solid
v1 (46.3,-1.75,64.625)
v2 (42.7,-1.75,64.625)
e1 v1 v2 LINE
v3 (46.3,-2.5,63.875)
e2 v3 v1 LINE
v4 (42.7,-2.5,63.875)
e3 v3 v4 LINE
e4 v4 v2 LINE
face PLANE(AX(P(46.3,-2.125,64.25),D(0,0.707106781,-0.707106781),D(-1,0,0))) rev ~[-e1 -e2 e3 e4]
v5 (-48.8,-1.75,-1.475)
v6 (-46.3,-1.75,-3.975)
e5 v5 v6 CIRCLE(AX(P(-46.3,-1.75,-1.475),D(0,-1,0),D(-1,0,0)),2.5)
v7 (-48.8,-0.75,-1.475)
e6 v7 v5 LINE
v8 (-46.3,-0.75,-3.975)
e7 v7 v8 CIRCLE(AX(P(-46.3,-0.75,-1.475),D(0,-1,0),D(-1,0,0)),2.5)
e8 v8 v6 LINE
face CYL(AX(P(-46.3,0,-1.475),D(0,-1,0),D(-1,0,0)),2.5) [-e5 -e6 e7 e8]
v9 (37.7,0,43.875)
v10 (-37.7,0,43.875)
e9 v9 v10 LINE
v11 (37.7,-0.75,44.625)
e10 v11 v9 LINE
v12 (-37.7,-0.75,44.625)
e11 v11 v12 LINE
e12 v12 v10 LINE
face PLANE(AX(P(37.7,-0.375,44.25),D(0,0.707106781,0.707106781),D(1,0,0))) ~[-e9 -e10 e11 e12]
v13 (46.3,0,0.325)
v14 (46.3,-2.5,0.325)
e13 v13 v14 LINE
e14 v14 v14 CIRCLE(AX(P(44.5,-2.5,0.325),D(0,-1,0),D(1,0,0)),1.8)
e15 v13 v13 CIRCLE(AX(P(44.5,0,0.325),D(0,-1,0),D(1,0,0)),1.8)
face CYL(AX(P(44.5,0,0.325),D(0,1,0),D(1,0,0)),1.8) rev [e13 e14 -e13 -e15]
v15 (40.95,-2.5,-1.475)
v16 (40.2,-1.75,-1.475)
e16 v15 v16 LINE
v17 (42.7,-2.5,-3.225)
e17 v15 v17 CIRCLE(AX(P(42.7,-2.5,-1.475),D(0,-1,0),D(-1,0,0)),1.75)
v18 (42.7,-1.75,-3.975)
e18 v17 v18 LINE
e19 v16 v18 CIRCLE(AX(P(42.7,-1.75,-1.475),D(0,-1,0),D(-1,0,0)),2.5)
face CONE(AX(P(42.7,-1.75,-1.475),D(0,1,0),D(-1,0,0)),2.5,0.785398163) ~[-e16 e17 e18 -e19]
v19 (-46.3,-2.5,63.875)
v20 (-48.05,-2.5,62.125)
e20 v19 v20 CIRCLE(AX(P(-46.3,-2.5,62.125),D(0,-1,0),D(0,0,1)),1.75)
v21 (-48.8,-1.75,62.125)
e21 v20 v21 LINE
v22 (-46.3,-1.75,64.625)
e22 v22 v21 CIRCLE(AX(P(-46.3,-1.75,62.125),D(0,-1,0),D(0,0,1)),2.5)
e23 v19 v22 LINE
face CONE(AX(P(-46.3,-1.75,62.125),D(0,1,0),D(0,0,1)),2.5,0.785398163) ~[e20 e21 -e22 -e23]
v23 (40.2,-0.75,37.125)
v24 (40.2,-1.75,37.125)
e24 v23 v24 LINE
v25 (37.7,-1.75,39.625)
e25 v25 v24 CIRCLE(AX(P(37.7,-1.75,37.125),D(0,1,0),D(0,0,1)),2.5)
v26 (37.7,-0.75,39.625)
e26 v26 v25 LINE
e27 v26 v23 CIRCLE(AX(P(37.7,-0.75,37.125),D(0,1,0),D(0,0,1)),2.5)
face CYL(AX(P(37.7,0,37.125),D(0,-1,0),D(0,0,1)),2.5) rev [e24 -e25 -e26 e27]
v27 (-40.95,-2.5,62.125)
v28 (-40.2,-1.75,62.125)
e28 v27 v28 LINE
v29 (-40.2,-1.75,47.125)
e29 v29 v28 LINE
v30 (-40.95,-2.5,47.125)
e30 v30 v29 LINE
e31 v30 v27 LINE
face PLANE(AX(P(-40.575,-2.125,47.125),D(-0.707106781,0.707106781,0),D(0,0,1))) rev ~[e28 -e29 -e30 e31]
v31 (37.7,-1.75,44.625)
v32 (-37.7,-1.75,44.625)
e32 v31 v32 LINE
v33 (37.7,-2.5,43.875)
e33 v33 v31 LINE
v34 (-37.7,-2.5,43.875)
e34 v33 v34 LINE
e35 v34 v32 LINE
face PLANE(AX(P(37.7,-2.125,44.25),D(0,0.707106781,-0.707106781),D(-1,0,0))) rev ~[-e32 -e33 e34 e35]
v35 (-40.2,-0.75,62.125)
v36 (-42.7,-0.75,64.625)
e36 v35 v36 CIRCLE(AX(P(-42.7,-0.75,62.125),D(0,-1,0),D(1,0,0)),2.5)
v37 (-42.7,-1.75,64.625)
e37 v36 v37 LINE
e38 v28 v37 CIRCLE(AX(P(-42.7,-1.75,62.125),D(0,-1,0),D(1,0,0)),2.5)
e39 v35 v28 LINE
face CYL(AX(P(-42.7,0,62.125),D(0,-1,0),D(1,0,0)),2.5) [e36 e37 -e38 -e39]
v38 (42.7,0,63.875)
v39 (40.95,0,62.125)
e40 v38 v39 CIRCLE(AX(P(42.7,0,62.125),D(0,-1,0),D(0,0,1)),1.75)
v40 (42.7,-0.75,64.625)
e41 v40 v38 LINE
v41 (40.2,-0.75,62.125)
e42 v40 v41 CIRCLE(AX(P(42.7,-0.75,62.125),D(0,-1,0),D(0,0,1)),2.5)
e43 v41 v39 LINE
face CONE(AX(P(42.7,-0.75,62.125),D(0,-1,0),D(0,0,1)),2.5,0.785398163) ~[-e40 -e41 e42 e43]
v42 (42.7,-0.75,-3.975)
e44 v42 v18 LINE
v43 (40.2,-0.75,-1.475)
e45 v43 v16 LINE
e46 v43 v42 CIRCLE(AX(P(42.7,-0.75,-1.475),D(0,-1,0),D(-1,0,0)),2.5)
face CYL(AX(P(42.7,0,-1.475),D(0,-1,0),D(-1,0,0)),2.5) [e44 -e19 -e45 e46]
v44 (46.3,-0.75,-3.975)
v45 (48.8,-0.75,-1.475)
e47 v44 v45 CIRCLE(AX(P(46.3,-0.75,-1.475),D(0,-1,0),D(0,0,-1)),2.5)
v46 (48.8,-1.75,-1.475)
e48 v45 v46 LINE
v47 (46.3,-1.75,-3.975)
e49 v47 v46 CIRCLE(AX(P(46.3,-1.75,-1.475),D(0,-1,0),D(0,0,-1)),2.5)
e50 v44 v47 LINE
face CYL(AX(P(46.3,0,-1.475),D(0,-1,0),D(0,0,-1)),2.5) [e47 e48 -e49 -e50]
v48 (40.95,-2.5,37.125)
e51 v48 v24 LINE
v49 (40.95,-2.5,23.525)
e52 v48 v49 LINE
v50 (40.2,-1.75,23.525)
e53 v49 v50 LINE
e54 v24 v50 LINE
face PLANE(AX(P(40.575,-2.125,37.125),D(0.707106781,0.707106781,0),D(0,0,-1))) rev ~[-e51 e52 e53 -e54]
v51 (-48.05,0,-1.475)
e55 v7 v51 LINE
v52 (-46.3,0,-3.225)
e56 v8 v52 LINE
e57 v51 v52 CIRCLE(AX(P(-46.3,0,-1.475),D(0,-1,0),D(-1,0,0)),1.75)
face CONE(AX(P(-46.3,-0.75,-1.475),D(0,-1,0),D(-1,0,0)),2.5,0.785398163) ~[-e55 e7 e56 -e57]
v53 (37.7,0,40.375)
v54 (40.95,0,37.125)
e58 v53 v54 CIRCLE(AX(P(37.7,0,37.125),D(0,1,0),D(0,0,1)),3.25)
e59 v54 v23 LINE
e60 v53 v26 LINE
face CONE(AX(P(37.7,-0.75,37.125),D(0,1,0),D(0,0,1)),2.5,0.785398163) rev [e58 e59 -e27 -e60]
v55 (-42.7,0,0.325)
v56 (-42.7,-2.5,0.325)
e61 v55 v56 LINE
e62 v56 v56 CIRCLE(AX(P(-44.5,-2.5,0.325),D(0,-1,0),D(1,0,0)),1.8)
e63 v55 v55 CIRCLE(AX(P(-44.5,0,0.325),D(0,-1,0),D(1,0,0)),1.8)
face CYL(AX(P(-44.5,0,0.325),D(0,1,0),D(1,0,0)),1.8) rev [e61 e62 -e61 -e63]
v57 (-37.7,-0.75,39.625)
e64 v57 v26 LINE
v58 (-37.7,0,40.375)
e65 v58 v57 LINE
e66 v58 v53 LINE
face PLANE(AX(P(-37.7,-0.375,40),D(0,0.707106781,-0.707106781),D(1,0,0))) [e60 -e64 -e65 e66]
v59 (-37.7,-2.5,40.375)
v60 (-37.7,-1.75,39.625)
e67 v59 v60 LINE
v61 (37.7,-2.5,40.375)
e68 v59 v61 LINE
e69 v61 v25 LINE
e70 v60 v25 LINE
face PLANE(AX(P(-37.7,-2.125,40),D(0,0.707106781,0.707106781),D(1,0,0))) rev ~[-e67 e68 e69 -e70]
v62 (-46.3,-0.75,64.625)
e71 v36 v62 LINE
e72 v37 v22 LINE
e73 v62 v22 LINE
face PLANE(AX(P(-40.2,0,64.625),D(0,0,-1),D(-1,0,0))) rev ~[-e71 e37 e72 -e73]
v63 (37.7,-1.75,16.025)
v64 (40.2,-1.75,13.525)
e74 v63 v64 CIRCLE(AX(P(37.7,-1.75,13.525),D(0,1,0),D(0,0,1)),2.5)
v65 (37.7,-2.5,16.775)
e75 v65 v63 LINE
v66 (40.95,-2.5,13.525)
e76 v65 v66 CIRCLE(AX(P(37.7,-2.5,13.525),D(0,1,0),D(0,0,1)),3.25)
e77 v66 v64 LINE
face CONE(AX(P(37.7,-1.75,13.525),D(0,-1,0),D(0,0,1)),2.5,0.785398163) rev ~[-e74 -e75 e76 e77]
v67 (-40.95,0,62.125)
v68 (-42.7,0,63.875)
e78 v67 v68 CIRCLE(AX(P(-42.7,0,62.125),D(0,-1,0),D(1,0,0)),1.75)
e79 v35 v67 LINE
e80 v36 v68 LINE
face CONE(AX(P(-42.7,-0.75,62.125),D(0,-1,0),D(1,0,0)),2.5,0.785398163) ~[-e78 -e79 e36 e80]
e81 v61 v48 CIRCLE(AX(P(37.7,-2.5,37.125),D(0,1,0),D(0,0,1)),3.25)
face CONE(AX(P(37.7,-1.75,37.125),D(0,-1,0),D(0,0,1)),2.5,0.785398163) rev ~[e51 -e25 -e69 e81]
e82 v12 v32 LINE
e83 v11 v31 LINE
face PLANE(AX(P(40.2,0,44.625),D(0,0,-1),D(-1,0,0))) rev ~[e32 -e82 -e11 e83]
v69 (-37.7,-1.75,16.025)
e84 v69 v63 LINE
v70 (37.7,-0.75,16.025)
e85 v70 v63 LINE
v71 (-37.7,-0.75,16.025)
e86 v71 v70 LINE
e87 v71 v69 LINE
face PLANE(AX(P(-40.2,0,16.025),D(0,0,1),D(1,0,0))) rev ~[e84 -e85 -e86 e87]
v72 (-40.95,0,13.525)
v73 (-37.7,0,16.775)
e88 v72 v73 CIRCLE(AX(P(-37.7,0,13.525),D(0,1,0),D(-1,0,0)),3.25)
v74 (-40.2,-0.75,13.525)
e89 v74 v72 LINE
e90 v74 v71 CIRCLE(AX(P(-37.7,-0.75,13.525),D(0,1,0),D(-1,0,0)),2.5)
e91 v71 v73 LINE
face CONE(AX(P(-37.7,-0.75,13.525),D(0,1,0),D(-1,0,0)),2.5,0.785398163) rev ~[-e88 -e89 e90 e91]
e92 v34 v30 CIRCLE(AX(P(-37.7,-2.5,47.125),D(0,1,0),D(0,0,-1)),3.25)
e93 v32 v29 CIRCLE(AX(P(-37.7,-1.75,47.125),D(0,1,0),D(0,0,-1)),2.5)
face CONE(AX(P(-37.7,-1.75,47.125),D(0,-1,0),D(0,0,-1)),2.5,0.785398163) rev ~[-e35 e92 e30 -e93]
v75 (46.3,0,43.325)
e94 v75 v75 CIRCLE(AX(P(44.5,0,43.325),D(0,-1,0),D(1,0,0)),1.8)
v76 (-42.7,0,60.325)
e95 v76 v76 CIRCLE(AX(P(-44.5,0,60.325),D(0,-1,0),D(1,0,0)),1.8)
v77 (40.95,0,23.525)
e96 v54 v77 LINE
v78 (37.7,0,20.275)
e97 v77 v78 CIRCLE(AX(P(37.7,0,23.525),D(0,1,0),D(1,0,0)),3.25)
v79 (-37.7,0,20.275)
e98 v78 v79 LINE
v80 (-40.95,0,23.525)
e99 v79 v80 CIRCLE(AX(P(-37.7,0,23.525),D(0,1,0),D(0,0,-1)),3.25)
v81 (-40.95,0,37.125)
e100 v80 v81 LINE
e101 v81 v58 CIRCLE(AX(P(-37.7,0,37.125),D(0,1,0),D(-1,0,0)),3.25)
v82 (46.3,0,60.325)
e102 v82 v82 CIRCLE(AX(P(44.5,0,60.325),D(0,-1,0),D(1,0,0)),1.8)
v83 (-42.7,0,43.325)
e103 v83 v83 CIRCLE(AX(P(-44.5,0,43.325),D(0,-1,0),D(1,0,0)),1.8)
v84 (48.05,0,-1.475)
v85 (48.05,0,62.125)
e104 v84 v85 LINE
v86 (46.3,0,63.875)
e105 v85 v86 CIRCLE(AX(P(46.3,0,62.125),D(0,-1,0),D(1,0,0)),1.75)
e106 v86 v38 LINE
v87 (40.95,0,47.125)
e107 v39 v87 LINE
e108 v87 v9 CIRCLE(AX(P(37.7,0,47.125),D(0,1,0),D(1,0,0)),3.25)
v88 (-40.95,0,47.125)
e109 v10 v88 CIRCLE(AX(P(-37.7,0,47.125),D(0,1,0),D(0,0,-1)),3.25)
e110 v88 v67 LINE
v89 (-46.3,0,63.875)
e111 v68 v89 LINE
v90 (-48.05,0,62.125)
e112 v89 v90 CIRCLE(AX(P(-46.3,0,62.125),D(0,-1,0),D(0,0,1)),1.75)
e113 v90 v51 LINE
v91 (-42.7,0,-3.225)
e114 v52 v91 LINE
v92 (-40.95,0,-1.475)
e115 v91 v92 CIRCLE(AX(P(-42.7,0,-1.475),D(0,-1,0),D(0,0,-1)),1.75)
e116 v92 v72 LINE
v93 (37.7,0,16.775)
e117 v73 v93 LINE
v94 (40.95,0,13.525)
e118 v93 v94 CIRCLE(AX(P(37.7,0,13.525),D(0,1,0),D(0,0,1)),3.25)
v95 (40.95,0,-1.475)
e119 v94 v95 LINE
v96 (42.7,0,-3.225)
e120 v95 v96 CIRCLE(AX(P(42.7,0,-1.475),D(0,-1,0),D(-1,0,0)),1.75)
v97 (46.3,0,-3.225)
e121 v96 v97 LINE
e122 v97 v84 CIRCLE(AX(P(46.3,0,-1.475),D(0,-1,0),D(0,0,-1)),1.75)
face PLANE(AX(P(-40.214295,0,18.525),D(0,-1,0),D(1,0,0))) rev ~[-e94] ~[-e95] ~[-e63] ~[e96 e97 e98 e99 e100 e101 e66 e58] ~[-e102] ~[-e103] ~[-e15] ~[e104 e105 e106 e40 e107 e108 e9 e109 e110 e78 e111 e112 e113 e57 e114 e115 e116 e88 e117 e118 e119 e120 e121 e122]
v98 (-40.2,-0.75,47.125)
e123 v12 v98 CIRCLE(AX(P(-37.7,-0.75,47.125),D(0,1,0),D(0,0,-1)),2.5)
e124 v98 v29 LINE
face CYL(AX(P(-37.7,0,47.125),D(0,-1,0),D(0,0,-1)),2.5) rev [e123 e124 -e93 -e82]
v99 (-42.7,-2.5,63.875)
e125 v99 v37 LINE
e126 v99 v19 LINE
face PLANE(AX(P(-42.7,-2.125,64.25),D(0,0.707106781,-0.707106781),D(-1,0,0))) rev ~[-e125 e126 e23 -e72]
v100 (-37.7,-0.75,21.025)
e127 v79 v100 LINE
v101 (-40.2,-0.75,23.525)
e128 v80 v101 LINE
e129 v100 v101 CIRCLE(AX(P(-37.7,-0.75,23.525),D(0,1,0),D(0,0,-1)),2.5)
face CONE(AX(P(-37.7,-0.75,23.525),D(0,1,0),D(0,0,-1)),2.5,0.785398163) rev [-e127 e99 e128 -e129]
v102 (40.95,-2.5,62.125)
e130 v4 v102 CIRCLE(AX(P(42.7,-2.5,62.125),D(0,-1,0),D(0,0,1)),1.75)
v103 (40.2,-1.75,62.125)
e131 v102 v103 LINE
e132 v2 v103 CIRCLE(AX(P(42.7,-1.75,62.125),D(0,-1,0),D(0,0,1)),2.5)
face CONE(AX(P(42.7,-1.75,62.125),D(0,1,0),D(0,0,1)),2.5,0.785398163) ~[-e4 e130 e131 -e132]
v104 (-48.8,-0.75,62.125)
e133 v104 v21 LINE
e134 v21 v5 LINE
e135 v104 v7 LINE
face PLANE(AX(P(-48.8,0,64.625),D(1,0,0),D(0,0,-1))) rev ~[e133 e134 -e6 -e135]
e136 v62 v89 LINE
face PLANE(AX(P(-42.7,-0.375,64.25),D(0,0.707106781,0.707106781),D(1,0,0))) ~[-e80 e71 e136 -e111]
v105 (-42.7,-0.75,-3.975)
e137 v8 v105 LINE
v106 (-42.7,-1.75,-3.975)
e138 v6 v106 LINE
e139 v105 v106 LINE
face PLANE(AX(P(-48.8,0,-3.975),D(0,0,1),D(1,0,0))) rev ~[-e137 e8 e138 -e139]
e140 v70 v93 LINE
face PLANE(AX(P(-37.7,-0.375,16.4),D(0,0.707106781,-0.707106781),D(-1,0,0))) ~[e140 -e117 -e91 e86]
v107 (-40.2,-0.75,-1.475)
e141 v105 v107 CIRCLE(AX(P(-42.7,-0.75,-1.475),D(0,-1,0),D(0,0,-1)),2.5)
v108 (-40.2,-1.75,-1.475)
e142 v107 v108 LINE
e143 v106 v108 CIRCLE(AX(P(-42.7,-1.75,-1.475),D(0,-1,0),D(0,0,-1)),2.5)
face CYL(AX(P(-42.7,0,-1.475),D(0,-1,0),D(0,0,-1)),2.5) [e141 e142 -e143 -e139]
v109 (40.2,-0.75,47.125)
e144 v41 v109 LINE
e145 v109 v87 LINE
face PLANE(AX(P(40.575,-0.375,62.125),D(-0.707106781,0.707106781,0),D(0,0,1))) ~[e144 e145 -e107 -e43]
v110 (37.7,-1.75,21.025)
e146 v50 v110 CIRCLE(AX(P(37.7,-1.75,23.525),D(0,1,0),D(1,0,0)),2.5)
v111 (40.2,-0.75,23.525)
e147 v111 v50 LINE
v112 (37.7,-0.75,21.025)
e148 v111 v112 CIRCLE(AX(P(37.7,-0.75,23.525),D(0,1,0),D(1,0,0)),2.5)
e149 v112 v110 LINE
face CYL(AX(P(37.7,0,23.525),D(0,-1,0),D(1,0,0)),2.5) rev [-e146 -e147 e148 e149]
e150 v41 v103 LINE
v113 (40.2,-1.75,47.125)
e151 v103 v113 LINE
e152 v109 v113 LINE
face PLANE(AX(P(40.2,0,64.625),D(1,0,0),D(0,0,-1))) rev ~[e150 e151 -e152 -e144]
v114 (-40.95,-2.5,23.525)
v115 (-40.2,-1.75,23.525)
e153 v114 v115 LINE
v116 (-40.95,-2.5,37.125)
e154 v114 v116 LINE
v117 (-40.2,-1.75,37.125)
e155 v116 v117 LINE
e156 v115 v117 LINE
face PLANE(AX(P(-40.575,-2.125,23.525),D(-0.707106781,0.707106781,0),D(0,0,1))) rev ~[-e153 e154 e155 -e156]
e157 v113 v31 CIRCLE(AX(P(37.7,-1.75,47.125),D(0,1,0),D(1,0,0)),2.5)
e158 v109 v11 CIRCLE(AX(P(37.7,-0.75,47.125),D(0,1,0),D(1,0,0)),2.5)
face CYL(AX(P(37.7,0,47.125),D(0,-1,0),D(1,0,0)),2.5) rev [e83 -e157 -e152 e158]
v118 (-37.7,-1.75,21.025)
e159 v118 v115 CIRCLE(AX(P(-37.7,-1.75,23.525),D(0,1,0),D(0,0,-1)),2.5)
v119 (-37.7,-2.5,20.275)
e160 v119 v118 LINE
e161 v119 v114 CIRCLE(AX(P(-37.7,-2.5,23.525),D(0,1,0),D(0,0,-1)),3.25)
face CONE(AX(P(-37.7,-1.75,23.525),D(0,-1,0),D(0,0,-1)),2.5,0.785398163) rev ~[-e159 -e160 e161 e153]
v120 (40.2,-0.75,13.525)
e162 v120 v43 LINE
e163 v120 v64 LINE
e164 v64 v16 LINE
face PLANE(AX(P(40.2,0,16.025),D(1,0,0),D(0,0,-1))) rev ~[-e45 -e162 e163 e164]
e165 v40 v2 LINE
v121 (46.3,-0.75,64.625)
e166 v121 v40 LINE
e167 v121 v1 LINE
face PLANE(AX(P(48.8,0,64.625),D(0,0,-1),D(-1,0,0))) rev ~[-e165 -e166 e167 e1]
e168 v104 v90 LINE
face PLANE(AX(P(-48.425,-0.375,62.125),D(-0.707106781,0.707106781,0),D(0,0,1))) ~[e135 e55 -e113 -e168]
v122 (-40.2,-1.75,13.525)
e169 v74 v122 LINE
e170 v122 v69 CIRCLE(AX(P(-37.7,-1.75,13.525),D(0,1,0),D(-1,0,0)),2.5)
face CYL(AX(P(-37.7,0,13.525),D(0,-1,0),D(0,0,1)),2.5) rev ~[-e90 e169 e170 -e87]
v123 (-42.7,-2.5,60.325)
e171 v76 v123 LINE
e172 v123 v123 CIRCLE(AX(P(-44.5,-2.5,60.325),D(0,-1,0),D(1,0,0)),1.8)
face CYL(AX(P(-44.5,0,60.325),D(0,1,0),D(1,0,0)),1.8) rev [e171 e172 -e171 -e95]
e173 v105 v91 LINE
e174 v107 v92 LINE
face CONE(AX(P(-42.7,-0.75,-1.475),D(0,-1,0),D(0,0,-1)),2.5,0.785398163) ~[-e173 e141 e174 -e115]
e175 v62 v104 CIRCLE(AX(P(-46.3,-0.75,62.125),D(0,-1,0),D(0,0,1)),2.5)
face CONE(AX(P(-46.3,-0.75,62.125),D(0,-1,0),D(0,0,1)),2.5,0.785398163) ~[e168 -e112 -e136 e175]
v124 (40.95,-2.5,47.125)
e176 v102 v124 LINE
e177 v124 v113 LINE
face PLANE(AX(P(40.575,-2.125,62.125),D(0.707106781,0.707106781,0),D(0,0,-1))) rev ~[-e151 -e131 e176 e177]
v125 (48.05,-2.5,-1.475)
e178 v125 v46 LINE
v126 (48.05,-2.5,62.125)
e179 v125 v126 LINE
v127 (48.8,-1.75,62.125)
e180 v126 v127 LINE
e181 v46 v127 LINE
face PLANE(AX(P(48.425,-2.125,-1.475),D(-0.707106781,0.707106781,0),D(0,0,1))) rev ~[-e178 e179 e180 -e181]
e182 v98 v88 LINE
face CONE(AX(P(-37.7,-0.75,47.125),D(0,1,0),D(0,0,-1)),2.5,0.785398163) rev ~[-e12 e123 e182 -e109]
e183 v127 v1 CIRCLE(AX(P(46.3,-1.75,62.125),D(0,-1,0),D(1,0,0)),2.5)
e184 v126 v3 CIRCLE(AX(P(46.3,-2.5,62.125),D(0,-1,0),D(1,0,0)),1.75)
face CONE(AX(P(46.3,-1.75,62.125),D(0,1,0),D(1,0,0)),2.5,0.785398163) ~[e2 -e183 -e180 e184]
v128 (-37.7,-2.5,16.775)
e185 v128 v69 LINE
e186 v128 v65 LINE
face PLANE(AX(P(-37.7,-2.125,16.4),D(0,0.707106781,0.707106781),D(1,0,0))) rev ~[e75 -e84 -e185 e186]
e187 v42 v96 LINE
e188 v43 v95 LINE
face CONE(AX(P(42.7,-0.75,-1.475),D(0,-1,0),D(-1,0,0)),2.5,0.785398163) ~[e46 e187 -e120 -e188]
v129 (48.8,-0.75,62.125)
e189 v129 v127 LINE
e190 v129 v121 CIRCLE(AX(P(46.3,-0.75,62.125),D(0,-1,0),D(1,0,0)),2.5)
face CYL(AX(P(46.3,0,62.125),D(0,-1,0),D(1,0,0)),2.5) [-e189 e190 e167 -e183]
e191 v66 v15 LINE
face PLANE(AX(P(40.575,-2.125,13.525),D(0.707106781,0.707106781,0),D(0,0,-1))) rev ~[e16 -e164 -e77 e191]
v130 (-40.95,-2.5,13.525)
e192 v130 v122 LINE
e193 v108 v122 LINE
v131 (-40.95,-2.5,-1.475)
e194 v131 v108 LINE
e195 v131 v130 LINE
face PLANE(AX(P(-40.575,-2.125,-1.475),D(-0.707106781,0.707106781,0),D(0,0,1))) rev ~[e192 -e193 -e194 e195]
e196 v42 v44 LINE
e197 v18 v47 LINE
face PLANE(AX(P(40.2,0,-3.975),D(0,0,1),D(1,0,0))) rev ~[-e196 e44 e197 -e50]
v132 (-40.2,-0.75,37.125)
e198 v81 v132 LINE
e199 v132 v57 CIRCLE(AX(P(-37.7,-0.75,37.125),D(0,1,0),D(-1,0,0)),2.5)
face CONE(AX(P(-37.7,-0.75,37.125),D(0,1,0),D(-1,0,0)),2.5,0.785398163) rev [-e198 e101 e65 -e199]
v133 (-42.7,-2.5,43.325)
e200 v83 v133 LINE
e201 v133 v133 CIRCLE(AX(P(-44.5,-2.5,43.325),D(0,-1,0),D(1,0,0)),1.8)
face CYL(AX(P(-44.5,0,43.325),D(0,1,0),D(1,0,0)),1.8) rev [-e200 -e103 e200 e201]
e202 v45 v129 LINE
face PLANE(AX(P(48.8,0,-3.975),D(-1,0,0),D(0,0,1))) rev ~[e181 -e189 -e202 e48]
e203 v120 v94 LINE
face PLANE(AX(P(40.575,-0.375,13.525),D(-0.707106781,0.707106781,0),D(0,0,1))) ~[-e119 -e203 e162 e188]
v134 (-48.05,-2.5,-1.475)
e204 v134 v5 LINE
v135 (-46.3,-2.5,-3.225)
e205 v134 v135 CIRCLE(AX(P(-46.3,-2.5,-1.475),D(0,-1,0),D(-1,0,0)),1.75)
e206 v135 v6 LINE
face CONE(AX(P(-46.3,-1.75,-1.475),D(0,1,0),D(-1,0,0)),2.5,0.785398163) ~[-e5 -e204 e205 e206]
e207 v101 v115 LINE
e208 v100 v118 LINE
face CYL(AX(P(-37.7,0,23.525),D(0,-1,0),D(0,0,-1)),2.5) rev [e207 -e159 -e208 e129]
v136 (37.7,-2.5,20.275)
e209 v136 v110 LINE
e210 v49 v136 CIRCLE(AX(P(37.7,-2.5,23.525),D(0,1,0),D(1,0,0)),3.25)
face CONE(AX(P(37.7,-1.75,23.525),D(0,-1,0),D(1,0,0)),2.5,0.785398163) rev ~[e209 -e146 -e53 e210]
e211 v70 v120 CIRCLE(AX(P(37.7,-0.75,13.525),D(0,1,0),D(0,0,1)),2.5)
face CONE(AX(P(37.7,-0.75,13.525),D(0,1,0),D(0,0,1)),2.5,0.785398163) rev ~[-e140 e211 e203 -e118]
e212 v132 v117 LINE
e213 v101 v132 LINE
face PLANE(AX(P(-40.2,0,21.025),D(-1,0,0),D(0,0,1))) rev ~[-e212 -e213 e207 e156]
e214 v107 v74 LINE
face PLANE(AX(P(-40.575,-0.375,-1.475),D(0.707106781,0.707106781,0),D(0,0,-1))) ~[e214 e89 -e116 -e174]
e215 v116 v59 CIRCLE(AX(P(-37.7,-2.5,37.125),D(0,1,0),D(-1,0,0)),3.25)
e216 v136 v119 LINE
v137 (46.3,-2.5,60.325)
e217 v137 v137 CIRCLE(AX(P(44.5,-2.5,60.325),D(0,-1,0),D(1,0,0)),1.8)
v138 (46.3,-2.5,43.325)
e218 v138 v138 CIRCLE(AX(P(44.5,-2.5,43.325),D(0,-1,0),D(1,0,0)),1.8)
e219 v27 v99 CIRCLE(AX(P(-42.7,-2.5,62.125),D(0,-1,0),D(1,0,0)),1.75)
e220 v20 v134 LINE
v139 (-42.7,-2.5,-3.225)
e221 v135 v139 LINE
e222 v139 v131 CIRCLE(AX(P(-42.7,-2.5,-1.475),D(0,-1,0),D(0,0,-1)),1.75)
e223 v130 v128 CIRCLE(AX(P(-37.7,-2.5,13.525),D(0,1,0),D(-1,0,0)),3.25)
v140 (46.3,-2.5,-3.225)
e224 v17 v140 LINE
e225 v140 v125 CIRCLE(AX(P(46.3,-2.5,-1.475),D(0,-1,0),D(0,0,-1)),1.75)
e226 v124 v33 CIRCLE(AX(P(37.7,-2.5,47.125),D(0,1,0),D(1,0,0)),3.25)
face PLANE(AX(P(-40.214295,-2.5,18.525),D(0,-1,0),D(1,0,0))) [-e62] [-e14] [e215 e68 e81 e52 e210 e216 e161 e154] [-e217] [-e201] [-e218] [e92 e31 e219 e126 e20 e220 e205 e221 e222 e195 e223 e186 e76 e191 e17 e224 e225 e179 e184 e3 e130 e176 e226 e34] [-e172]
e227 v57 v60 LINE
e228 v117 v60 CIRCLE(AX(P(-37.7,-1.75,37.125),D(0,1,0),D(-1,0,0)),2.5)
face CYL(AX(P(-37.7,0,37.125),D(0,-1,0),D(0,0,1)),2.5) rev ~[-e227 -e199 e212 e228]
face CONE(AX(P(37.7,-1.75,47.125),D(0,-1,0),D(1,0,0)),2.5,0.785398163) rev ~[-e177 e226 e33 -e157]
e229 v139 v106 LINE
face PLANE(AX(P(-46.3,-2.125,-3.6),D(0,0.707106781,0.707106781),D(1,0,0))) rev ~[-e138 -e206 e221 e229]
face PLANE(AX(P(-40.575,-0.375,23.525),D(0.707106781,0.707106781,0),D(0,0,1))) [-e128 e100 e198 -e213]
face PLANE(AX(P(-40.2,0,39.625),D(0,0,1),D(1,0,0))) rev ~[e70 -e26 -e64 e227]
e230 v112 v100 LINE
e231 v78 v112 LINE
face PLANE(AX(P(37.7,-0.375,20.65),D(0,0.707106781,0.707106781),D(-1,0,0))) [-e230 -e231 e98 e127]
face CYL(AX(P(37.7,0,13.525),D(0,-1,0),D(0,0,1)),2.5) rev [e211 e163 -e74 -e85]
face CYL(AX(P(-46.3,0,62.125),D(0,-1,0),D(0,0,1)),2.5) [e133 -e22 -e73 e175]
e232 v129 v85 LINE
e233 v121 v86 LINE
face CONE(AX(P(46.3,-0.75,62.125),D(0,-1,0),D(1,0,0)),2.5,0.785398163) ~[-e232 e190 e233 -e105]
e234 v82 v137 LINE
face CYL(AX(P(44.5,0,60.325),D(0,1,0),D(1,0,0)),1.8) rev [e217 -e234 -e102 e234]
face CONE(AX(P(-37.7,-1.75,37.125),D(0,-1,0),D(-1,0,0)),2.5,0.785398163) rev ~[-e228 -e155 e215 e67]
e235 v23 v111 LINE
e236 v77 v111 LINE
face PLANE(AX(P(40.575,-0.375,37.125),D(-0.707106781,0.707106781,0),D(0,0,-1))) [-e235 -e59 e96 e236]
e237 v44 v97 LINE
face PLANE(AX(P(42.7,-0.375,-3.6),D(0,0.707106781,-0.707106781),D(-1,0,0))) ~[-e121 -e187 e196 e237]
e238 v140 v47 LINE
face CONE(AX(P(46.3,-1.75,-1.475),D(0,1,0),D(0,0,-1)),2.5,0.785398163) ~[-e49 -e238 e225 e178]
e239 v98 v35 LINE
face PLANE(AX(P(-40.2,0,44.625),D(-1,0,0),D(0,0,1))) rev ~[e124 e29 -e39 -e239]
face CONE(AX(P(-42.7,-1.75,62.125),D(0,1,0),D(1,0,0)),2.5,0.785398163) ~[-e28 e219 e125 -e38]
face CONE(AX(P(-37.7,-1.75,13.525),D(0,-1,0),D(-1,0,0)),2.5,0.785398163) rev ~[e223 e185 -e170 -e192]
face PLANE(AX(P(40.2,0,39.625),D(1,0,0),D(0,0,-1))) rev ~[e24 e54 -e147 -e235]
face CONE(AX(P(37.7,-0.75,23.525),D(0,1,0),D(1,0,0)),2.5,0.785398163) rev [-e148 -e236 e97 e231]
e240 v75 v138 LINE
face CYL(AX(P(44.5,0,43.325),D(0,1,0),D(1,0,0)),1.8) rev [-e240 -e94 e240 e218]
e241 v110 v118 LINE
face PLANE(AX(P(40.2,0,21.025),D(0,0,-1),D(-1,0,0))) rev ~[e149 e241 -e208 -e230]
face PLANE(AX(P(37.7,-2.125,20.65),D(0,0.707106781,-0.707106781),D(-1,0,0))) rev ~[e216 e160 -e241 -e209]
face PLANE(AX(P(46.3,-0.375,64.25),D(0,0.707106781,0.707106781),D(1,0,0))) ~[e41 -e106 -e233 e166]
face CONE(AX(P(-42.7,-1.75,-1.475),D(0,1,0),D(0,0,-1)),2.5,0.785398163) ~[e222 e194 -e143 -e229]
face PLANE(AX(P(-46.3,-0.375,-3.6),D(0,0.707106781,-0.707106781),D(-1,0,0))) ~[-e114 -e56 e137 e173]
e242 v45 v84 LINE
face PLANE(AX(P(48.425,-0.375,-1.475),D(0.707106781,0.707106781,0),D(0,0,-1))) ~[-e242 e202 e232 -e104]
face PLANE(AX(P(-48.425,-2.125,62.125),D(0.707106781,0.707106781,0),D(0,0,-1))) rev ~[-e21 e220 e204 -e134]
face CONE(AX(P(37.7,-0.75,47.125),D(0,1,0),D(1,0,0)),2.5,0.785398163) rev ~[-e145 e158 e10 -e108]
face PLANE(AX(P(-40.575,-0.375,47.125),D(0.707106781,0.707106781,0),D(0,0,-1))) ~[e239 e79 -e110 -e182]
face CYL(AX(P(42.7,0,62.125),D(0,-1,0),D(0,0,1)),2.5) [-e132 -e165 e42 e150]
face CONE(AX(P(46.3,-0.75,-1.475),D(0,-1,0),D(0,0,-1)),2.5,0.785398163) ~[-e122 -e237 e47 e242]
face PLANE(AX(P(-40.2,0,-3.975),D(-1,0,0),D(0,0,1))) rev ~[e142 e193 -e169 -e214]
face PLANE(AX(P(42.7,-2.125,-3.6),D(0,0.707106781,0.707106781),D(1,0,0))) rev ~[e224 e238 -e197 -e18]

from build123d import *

# Parameters (mm, degrees)
F0_W     = 0.0285906434
F0_H     = 5
F0_W_2   = 40.2
F0_R     = 1.8
F1_DEPTH = 2.5
F2_R     = 2.5
F3_SIZE  = 0.75


# Not quite as in the source:
# - a feature names something its author has since deleted; it is built from what else it names


with BuildPart() as f1:
    # F0 (on Front) → F1 (new body)
    with BuildSketch(Plane.XZ):
        with Locations((-40.2142953217, 18.525)):
            Rectangle(F0_W, F0_H)
        with Locations((40.2142953217, 18.525)):
            Rectangle(F0_W, F0_H)
        with Locations((-20.1, 18.525)):
            Rectangle(F0_W_2, F0_H)
        with Locations((20.1, 18.525)):
            Rectangle(F0_W_2, F0_H)
        with Locations((20.1, 42.125)):
            Rectangle(F0_W_2, F0_H)
        Polygon((40.2, 64.625), (40.2, 44.625), (40.2, 39.625), (40.2, 21.025), (40.2285906434, 21.025), (40.2285906434, 16.025), (40.2, 16.025), (40.2, -3.975), (48.8, -3.975), (48.8, 64.625), align=None)
        with Locations((44.5, 0.325)):
            Circle(F0_R, mode=Mode.SUBTRACT)
        with Locations((44.5, 43.325)):
            Circle(F0_R, mode=Mode.SUBTRACT)
        with Locations((44.5, 60.325)):
            Circle(F0_R, mode=Mode.SUBTRACT)
        with Locations((-20.1, 42.125)):
            Rectangle(F0_W_2, F0_H)
        Polygon((-40.2, 64.625), (-48.8, 64.625), (-48.8, -3.975), (-40.2, -3.975), (-40.2, 16.025), (-40.2285906434, 16.025), (-40.2285906434, 21.025), (-40.2, 21.025), (-40.2, 39.625), (-40.2, 44.625), align=None)
        with Locations((-44.5, 0.325)):
            Circle(F0_R, mode=Mode.SUBTRACT)
        with Locations((-44.5, 43.325)):
            Circle(F0_R, mode=Mode.SUBTRACT)
        with Locations((-44.5, 60.325)):
            Circle(F0_R, mode=Mode.SUBTRACT)
    extrude(amount=F1_DEPTH)

    # F2
    f2_edges = [f1.edges().sort_by_distance(p)[0] for p in [
        (-40.2, -1.25, 44.625),
        (40.2, -1.25, 44.625),
        (-40.2, -1.25, 39.625),
        (40.2, -1.25, 39.625),
        (-40.2, -1.25, 21.025),
        (40.2, -1.25, 21.025),
        (-40.2, -1.25, 16.025),
        (40.2, -1.25, 16.025),
        (40.2, -1.25, -3.975),
        (48.8, -1.25, -3.975),
        (-48.8, -1.25, -3.975),
        (-40.2, -1.25, -3.975),
        (48.8, -1.25, 64.625),
        (40.2, -1.25, 64.625),
        (-48.8, -1.25, 64.625),
        (-40.2, -1.25, 64.625),
    ]]
    fillet(f2_edges, radius=F2_R)

    # F3
    f3_edges = [f1.edges().sort_by_distance(p)[0] for p in [
        (0, 0, 16.025),
        (0, 0, 39.625),
        (-44.5, -2.5, 64.625),
        (0, -2.5, 39.625),
    ]]
    chamfer(f3_edges, length=F3_SIZE)


solid = f1.part
